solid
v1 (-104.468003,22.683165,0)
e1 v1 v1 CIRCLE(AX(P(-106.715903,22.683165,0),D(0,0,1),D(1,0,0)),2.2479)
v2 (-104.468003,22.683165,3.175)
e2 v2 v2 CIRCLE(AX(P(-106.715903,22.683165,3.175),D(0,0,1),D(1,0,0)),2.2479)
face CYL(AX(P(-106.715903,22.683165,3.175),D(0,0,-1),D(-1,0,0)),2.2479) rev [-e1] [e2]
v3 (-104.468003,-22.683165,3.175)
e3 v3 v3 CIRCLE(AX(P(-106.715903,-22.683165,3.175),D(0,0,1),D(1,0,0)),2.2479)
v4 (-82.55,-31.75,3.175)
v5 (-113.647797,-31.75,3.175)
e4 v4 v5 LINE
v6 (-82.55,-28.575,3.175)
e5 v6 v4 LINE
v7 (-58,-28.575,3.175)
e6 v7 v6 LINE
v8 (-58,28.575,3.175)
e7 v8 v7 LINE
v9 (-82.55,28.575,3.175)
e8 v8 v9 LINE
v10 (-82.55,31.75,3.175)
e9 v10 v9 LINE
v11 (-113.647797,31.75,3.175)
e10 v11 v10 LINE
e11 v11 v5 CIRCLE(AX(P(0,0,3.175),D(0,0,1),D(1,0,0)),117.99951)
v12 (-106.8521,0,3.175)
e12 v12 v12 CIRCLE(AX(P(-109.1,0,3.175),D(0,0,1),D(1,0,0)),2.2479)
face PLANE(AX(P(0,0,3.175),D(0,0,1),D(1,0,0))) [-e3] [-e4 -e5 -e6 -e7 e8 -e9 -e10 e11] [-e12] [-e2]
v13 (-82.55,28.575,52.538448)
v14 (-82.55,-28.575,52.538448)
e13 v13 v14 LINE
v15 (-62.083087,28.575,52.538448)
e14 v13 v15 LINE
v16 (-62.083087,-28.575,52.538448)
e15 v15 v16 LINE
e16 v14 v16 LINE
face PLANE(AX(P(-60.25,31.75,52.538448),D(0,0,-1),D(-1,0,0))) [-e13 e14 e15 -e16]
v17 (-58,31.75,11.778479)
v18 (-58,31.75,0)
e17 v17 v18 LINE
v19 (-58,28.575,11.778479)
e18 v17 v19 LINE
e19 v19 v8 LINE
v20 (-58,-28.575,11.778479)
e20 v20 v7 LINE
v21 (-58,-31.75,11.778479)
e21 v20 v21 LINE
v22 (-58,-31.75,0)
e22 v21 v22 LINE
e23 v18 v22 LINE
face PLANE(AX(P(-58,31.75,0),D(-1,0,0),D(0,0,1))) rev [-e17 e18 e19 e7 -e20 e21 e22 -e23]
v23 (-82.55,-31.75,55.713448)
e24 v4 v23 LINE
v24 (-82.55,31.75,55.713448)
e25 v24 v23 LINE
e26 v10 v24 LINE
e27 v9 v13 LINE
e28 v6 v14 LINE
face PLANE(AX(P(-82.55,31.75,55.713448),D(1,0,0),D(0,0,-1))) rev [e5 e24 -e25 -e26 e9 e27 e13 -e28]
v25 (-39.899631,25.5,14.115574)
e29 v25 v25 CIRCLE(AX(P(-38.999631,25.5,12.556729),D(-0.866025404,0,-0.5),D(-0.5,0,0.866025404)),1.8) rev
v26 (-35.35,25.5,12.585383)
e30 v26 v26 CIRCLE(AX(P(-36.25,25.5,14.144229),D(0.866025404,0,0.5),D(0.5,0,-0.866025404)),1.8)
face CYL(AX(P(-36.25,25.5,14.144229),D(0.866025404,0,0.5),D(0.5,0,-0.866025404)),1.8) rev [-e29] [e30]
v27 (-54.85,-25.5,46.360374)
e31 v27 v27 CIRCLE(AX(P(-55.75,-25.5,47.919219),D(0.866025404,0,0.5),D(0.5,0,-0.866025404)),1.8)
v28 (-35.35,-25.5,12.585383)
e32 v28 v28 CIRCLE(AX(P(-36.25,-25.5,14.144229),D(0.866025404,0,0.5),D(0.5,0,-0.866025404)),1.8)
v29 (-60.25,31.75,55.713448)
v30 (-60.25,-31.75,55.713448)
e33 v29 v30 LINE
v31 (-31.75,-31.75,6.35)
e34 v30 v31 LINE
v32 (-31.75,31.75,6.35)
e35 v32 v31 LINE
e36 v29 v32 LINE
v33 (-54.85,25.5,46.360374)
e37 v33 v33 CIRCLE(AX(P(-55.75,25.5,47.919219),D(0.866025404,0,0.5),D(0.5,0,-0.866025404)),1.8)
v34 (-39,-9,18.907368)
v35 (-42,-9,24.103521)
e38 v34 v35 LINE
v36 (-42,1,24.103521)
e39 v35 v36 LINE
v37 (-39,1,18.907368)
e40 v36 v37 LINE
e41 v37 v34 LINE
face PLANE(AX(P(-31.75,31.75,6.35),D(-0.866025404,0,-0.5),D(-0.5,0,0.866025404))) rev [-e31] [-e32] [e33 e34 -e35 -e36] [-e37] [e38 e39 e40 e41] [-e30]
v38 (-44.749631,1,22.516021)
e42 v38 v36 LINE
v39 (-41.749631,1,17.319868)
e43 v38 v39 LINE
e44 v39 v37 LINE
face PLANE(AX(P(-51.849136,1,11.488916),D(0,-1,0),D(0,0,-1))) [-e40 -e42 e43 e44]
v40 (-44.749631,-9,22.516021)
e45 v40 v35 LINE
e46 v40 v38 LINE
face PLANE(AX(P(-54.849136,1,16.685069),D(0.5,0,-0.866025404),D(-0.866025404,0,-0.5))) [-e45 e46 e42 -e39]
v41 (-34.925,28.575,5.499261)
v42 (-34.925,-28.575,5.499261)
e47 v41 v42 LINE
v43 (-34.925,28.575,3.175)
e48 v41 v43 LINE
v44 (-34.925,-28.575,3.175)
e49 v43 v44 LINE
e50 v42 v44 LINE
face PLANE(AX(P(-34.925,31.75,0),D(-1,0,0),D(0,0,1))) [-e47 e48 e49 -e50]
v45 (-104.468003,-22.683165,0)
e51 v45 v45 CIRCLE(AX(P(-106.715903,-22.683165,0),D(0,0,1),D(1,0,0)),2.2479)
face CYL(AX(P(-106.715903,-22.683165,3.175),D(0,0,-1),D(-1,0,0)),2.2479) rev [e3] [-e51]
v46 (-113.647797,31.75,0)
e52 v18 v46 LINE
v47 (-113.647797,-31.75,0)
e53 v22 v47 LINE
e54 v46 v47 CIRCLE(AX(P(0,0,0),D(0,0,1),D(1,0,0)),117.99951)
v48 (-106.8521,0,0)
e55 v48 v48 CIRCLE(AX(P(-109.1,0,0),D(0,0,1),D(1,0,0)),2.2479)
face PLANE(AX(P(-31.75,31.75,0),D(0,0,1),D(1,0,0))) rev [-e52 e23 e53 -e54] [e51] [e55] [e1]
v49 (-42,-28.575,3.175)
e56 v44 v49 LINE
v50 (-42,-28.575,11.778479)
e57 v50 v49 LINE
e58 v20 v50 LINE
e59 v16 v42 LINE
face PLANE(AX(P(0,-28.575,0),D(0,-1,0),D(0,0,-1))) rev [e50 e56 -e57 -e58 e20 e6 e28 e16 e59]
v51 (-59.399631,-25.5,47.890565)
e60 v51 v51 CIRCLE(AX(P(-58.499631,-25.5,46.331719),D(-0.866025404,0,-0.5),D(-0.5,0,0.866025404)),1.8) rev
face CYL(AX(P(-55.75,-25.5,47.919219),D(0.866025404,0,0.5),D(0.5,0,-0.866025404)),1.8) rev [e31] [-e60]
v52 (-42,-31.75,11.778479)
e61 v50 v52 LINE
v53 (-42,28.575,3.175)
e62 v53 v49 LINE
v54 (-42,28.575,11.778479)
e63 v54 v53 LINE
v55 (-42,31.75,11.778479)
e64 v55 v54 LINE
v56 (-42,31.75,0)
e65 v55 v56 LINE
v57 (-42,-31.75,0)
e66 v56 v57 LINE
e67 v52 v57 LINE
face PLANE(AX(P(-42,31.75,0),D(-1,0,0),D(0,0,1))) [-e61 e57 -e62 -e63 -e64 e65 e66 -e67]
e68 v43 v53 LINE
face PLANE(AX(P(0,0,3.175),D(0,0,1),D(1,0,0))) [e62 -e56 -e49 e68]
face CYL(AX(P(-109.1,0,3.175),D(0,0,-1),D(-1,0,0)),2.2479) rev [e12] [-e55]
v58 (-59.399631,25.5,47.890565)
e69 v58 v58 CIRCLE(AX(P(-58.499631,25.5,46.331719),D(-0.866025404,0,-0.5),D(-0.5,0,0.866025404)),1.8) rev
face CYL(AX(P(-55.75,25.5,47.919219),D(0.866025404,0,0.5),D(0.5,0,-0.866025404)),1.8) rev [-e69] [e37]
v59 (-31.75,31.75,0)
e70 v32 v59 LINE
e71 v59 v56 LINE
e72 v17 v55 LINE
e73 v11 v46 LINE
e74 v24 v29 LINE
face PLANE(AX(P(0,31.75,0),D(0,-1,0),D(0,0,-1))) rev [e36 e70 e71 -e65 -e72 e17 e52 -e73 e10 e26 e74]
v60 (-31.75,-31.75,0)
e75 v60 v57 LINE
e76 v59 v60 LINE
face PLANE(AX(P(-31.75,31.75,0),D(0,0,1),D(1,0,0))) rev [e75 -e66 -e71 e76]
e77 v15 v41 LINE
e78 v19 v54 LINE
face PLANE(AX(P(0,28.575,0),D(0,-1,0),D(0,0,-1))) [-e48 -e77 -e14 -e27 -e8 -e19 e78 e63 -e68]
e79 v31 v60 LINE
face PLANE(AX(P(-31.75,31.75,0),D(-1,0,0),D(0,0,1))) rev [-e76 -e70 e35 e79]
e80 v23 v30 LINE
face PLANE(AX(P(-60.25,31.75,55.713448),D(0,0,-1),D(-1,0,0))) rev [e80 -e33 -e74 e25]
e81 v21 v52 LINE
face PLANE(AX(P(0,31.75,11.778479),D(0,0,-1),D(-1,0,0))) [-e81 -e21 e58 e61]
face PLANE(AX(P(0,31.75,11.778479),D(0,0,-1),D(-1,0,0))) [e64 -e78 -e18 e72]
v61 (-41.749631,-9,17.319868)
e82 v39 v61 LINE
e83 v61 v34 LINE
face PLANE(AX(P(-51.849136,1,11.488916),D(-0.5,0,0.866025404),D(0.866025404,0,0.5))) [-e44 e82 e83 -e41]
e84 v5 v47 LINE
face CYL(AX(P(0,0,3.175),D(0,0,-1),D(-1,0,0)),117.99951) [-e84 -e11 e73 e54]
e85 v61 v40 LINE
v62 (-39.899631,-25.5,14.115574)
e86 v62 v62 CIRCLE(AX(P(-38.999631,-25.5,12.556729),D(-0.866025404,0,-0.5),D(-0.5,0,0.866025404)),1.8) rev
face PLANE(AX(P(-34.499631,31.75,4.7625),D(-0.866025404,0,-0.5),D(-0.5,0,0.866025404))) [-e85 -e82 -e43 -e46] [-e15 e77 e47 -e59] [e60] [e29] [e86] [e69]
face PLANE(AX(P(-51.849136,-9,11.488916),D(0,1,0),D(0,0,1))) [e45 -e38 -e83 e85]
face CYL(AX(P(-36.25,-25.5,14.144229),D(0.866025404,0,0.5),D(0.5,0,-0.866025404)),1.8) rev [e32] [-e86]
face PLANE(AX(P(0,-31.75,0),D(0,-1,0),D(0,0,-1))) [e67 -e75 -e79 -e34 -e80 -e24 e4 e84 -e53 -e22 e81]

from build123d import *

# Parameters (mm, degrees)
BOSS_EXTRUDE5_DEPTH            = 31.75
BOSS_EXTRUDE5_DEPTH_BACK       = 31.75
SKETCH1_R                      = 2.2479
BOSS_EXTRUDE6_DEPTH            = 3.175
SHELL2_START                   = -28.575
SHELL2_DEPTH                   = 57.15
F_1_0MM_DOWEL_HOLE1_AT_2_COUNT = 2
F_1_0MM_DOWEL_HOLE1_AT_2_PITCH = 51
F_1_0MM_DOWEL_HOLE1_AT_3_COUNT = 2
F_1_0MM_DOWEL_HOLE1_AT_3_PITCH = 64.202803677
F_1_0MM_DOWEL_HOLE1_AT_4_COUNT = 2
F_1_0MM_DOWEL_HOLE1_AT_4_PITCH = 39
SKETCH9_W                      = 16
SKETCH9_H                      = 9.25
SKETCH9_H_2                    = 2.52847891
CUT_EXTRUDE1_DEPTH             = 146.121062048
SKETCH10_W                     = 6
SKETCH10_H                     = 10
CUT_EXTRUDE2_DEPTH             = 3.175


# Read off the part's stored shape, not the designer's step: Shell2
with BuildPart() as part:
    # Sketch5 → Boss-Extrude5 (new, two sides: drawn at the far end of the back side and taken through both)
    with BuildSketch(Plane(origin=(0, 0, 0), x_dir=(1, 0, 0), z_dir=(0, 1, 0)).offset(-BOSS_EXTRUDE5_DEPTH_BACK)):
        Polygon((-31.75, 0), (-31.75, -6.35), (-60.25, -55.713448016), (-82.55, -55.713448016), (-82.55, 0), align=None)
    extrude(amount=BOSS_EXTRUDE5_DEPTH + BOSS_EXTRUDE5_DEPTH_BACK)

    # Sketch1 → Boss-Extrude6 (add)
    with BuildSketch(Plane.XY):
        with BuildLine():
            Line((-31.75, 31.75), (-113.647797428, 31.75))
            ThreePointArc((-113.647797428, 31.75), (-117.99951, 0), (-113.647797428, -31.75))
            Line((-113.647797428, -31.75), (-31.75, -31.75))
            Line((-31.75, -31.75), (-31.75, 31.75))
        make_face()
        with Locations((-106.71590324, -22.683165468)):
            Circle(SKETCH1_R, mode=Mode.SUBTRACT)
        with Locations((-109.1, 0)):
            Circle(SKETCH1_R, mode=Mode.SUBTRACT)
        with Locations((-106.71590324, 22.683165468)):
            Circle(SKETCH1_R, mode=Mode.SUBTRACT)
    extrude(amount=BOSS_EXTRUDE6_DEPTH)

    # Shell2 outline → Shell2 (cut)
    with BuildSketch(Plane(origin=(0, 0, 0), x_dir=(1, 0, 0), z_dir=(0, 1, 0)).offset(SHELL2_START)):
        Polygon((-34.925, -3.175), (-82.55, -3.175), (-82.55, -52.538448016), (-62.083087105, -52.538448016), (-34.925, -5.499261314), align=None)
    extrude(amount=SHELL2_DEPTH, mode=Mode.SUBTRACT)

    # Sketch8 → Ø1.0mm Dowel Hole1 (revolve, cut)
    with BuildSketch(Plane(origin=(-55.75, -25.5, 47.919219382), x_dir=(0.4999999999999977, 0, -0.86602540378444), z_dir=(0, 1, 0))):
        Polygon((0, 0), (0, 4.256549114), (1.8, 3.175), (1.8, 0), align=None)
    f_1_0mm_dowel_hole1 = revolve(axis=Axis((-50.250738686, -25.5, 51.094219382), (-0.86602540378444, 0, -0.4999999999999977)), mode=Mode.SUBTRACT)

    # Ø1.0mm Dowel Hole1 at 2: Ø1.0mm Dowel Hole1 ×2
    with Locations(*[(0, i * F_1_0MM_DOWEL_HOLE1_AT_2_PITCH, 0) for i in range(1, F_1_0MM_DOWEL_HOLE1_AT_2_COUNT)]):
        add(f_1_0mm_dowel_hole1, mode=Mode.SUBTRACT)

    # Ø1.0mm Dowel Hole1 at 3: Ø1.0mm Dowel Hole1 ×2
    with Locations(*[Vector(0.3037250537853972, 0.7943578329771961, -0.5260672246879011) * (i * F_1_0MM_DOWEL_HOLE1_AT_3_PITCH) for i in range(1, F_1_0MM_DOWEL_HOLE1_AT_3_COUNT)]):
        add(f_1_0mm_dowel_hole1, mode=Mode.SUBTRACT)

    # Ø1.0mm Dowel Hole1 at 4: Ø1.0mm Dowel Hole1 ×2
    with Locations(*[Vector(0.49999999999999767, 0, -0.86602540378444) * (i * F_1_0MM_DOWEL_HOLE1_AT_4_PITCH) for i in range(1, F_1_0MM_DOWEL_HOLE1_AT_4_COUNT)]):
        add(f_1_0mm_dowel_hole1, mode=Mode.SUBTRACT)

    # Sketch9 → Cut-Extrude1 (cut, through all)
    with BuildSketch(Plane.XZ.offset(31.75)):
        with Locations((-50, 4.625)):
            Rectangle(SKETCH9_W, SKETCH9_H)
        with Locations((-50, 10.514239455)):
            Rectangle(SKETCH9_W, SKETCH9_H_2)
    extrude(amount=-CUT_EXTRUDE1_DEPTH, mode=Mode.SUBTRACT)

    # Sketch10 → Cut-Extrude2 (cut)
    with BuildSketch(Plane(origin=(-21.062869343, 0, -12.160653285), x_dir=(-0.4999999999999977, 0, 0.8660254037844399), z_dir=(-0.8660254037844399, 0, -0.4999999999999977))):
        with Locations((38.874261314, -4)):
            Rectangle(SKETCH10_W, SKETCH10_H)
    extrude(amount=CUT_EXTRUDE2_DEPTH, mode=Mode.SUBTRACT)


solid = part.part
